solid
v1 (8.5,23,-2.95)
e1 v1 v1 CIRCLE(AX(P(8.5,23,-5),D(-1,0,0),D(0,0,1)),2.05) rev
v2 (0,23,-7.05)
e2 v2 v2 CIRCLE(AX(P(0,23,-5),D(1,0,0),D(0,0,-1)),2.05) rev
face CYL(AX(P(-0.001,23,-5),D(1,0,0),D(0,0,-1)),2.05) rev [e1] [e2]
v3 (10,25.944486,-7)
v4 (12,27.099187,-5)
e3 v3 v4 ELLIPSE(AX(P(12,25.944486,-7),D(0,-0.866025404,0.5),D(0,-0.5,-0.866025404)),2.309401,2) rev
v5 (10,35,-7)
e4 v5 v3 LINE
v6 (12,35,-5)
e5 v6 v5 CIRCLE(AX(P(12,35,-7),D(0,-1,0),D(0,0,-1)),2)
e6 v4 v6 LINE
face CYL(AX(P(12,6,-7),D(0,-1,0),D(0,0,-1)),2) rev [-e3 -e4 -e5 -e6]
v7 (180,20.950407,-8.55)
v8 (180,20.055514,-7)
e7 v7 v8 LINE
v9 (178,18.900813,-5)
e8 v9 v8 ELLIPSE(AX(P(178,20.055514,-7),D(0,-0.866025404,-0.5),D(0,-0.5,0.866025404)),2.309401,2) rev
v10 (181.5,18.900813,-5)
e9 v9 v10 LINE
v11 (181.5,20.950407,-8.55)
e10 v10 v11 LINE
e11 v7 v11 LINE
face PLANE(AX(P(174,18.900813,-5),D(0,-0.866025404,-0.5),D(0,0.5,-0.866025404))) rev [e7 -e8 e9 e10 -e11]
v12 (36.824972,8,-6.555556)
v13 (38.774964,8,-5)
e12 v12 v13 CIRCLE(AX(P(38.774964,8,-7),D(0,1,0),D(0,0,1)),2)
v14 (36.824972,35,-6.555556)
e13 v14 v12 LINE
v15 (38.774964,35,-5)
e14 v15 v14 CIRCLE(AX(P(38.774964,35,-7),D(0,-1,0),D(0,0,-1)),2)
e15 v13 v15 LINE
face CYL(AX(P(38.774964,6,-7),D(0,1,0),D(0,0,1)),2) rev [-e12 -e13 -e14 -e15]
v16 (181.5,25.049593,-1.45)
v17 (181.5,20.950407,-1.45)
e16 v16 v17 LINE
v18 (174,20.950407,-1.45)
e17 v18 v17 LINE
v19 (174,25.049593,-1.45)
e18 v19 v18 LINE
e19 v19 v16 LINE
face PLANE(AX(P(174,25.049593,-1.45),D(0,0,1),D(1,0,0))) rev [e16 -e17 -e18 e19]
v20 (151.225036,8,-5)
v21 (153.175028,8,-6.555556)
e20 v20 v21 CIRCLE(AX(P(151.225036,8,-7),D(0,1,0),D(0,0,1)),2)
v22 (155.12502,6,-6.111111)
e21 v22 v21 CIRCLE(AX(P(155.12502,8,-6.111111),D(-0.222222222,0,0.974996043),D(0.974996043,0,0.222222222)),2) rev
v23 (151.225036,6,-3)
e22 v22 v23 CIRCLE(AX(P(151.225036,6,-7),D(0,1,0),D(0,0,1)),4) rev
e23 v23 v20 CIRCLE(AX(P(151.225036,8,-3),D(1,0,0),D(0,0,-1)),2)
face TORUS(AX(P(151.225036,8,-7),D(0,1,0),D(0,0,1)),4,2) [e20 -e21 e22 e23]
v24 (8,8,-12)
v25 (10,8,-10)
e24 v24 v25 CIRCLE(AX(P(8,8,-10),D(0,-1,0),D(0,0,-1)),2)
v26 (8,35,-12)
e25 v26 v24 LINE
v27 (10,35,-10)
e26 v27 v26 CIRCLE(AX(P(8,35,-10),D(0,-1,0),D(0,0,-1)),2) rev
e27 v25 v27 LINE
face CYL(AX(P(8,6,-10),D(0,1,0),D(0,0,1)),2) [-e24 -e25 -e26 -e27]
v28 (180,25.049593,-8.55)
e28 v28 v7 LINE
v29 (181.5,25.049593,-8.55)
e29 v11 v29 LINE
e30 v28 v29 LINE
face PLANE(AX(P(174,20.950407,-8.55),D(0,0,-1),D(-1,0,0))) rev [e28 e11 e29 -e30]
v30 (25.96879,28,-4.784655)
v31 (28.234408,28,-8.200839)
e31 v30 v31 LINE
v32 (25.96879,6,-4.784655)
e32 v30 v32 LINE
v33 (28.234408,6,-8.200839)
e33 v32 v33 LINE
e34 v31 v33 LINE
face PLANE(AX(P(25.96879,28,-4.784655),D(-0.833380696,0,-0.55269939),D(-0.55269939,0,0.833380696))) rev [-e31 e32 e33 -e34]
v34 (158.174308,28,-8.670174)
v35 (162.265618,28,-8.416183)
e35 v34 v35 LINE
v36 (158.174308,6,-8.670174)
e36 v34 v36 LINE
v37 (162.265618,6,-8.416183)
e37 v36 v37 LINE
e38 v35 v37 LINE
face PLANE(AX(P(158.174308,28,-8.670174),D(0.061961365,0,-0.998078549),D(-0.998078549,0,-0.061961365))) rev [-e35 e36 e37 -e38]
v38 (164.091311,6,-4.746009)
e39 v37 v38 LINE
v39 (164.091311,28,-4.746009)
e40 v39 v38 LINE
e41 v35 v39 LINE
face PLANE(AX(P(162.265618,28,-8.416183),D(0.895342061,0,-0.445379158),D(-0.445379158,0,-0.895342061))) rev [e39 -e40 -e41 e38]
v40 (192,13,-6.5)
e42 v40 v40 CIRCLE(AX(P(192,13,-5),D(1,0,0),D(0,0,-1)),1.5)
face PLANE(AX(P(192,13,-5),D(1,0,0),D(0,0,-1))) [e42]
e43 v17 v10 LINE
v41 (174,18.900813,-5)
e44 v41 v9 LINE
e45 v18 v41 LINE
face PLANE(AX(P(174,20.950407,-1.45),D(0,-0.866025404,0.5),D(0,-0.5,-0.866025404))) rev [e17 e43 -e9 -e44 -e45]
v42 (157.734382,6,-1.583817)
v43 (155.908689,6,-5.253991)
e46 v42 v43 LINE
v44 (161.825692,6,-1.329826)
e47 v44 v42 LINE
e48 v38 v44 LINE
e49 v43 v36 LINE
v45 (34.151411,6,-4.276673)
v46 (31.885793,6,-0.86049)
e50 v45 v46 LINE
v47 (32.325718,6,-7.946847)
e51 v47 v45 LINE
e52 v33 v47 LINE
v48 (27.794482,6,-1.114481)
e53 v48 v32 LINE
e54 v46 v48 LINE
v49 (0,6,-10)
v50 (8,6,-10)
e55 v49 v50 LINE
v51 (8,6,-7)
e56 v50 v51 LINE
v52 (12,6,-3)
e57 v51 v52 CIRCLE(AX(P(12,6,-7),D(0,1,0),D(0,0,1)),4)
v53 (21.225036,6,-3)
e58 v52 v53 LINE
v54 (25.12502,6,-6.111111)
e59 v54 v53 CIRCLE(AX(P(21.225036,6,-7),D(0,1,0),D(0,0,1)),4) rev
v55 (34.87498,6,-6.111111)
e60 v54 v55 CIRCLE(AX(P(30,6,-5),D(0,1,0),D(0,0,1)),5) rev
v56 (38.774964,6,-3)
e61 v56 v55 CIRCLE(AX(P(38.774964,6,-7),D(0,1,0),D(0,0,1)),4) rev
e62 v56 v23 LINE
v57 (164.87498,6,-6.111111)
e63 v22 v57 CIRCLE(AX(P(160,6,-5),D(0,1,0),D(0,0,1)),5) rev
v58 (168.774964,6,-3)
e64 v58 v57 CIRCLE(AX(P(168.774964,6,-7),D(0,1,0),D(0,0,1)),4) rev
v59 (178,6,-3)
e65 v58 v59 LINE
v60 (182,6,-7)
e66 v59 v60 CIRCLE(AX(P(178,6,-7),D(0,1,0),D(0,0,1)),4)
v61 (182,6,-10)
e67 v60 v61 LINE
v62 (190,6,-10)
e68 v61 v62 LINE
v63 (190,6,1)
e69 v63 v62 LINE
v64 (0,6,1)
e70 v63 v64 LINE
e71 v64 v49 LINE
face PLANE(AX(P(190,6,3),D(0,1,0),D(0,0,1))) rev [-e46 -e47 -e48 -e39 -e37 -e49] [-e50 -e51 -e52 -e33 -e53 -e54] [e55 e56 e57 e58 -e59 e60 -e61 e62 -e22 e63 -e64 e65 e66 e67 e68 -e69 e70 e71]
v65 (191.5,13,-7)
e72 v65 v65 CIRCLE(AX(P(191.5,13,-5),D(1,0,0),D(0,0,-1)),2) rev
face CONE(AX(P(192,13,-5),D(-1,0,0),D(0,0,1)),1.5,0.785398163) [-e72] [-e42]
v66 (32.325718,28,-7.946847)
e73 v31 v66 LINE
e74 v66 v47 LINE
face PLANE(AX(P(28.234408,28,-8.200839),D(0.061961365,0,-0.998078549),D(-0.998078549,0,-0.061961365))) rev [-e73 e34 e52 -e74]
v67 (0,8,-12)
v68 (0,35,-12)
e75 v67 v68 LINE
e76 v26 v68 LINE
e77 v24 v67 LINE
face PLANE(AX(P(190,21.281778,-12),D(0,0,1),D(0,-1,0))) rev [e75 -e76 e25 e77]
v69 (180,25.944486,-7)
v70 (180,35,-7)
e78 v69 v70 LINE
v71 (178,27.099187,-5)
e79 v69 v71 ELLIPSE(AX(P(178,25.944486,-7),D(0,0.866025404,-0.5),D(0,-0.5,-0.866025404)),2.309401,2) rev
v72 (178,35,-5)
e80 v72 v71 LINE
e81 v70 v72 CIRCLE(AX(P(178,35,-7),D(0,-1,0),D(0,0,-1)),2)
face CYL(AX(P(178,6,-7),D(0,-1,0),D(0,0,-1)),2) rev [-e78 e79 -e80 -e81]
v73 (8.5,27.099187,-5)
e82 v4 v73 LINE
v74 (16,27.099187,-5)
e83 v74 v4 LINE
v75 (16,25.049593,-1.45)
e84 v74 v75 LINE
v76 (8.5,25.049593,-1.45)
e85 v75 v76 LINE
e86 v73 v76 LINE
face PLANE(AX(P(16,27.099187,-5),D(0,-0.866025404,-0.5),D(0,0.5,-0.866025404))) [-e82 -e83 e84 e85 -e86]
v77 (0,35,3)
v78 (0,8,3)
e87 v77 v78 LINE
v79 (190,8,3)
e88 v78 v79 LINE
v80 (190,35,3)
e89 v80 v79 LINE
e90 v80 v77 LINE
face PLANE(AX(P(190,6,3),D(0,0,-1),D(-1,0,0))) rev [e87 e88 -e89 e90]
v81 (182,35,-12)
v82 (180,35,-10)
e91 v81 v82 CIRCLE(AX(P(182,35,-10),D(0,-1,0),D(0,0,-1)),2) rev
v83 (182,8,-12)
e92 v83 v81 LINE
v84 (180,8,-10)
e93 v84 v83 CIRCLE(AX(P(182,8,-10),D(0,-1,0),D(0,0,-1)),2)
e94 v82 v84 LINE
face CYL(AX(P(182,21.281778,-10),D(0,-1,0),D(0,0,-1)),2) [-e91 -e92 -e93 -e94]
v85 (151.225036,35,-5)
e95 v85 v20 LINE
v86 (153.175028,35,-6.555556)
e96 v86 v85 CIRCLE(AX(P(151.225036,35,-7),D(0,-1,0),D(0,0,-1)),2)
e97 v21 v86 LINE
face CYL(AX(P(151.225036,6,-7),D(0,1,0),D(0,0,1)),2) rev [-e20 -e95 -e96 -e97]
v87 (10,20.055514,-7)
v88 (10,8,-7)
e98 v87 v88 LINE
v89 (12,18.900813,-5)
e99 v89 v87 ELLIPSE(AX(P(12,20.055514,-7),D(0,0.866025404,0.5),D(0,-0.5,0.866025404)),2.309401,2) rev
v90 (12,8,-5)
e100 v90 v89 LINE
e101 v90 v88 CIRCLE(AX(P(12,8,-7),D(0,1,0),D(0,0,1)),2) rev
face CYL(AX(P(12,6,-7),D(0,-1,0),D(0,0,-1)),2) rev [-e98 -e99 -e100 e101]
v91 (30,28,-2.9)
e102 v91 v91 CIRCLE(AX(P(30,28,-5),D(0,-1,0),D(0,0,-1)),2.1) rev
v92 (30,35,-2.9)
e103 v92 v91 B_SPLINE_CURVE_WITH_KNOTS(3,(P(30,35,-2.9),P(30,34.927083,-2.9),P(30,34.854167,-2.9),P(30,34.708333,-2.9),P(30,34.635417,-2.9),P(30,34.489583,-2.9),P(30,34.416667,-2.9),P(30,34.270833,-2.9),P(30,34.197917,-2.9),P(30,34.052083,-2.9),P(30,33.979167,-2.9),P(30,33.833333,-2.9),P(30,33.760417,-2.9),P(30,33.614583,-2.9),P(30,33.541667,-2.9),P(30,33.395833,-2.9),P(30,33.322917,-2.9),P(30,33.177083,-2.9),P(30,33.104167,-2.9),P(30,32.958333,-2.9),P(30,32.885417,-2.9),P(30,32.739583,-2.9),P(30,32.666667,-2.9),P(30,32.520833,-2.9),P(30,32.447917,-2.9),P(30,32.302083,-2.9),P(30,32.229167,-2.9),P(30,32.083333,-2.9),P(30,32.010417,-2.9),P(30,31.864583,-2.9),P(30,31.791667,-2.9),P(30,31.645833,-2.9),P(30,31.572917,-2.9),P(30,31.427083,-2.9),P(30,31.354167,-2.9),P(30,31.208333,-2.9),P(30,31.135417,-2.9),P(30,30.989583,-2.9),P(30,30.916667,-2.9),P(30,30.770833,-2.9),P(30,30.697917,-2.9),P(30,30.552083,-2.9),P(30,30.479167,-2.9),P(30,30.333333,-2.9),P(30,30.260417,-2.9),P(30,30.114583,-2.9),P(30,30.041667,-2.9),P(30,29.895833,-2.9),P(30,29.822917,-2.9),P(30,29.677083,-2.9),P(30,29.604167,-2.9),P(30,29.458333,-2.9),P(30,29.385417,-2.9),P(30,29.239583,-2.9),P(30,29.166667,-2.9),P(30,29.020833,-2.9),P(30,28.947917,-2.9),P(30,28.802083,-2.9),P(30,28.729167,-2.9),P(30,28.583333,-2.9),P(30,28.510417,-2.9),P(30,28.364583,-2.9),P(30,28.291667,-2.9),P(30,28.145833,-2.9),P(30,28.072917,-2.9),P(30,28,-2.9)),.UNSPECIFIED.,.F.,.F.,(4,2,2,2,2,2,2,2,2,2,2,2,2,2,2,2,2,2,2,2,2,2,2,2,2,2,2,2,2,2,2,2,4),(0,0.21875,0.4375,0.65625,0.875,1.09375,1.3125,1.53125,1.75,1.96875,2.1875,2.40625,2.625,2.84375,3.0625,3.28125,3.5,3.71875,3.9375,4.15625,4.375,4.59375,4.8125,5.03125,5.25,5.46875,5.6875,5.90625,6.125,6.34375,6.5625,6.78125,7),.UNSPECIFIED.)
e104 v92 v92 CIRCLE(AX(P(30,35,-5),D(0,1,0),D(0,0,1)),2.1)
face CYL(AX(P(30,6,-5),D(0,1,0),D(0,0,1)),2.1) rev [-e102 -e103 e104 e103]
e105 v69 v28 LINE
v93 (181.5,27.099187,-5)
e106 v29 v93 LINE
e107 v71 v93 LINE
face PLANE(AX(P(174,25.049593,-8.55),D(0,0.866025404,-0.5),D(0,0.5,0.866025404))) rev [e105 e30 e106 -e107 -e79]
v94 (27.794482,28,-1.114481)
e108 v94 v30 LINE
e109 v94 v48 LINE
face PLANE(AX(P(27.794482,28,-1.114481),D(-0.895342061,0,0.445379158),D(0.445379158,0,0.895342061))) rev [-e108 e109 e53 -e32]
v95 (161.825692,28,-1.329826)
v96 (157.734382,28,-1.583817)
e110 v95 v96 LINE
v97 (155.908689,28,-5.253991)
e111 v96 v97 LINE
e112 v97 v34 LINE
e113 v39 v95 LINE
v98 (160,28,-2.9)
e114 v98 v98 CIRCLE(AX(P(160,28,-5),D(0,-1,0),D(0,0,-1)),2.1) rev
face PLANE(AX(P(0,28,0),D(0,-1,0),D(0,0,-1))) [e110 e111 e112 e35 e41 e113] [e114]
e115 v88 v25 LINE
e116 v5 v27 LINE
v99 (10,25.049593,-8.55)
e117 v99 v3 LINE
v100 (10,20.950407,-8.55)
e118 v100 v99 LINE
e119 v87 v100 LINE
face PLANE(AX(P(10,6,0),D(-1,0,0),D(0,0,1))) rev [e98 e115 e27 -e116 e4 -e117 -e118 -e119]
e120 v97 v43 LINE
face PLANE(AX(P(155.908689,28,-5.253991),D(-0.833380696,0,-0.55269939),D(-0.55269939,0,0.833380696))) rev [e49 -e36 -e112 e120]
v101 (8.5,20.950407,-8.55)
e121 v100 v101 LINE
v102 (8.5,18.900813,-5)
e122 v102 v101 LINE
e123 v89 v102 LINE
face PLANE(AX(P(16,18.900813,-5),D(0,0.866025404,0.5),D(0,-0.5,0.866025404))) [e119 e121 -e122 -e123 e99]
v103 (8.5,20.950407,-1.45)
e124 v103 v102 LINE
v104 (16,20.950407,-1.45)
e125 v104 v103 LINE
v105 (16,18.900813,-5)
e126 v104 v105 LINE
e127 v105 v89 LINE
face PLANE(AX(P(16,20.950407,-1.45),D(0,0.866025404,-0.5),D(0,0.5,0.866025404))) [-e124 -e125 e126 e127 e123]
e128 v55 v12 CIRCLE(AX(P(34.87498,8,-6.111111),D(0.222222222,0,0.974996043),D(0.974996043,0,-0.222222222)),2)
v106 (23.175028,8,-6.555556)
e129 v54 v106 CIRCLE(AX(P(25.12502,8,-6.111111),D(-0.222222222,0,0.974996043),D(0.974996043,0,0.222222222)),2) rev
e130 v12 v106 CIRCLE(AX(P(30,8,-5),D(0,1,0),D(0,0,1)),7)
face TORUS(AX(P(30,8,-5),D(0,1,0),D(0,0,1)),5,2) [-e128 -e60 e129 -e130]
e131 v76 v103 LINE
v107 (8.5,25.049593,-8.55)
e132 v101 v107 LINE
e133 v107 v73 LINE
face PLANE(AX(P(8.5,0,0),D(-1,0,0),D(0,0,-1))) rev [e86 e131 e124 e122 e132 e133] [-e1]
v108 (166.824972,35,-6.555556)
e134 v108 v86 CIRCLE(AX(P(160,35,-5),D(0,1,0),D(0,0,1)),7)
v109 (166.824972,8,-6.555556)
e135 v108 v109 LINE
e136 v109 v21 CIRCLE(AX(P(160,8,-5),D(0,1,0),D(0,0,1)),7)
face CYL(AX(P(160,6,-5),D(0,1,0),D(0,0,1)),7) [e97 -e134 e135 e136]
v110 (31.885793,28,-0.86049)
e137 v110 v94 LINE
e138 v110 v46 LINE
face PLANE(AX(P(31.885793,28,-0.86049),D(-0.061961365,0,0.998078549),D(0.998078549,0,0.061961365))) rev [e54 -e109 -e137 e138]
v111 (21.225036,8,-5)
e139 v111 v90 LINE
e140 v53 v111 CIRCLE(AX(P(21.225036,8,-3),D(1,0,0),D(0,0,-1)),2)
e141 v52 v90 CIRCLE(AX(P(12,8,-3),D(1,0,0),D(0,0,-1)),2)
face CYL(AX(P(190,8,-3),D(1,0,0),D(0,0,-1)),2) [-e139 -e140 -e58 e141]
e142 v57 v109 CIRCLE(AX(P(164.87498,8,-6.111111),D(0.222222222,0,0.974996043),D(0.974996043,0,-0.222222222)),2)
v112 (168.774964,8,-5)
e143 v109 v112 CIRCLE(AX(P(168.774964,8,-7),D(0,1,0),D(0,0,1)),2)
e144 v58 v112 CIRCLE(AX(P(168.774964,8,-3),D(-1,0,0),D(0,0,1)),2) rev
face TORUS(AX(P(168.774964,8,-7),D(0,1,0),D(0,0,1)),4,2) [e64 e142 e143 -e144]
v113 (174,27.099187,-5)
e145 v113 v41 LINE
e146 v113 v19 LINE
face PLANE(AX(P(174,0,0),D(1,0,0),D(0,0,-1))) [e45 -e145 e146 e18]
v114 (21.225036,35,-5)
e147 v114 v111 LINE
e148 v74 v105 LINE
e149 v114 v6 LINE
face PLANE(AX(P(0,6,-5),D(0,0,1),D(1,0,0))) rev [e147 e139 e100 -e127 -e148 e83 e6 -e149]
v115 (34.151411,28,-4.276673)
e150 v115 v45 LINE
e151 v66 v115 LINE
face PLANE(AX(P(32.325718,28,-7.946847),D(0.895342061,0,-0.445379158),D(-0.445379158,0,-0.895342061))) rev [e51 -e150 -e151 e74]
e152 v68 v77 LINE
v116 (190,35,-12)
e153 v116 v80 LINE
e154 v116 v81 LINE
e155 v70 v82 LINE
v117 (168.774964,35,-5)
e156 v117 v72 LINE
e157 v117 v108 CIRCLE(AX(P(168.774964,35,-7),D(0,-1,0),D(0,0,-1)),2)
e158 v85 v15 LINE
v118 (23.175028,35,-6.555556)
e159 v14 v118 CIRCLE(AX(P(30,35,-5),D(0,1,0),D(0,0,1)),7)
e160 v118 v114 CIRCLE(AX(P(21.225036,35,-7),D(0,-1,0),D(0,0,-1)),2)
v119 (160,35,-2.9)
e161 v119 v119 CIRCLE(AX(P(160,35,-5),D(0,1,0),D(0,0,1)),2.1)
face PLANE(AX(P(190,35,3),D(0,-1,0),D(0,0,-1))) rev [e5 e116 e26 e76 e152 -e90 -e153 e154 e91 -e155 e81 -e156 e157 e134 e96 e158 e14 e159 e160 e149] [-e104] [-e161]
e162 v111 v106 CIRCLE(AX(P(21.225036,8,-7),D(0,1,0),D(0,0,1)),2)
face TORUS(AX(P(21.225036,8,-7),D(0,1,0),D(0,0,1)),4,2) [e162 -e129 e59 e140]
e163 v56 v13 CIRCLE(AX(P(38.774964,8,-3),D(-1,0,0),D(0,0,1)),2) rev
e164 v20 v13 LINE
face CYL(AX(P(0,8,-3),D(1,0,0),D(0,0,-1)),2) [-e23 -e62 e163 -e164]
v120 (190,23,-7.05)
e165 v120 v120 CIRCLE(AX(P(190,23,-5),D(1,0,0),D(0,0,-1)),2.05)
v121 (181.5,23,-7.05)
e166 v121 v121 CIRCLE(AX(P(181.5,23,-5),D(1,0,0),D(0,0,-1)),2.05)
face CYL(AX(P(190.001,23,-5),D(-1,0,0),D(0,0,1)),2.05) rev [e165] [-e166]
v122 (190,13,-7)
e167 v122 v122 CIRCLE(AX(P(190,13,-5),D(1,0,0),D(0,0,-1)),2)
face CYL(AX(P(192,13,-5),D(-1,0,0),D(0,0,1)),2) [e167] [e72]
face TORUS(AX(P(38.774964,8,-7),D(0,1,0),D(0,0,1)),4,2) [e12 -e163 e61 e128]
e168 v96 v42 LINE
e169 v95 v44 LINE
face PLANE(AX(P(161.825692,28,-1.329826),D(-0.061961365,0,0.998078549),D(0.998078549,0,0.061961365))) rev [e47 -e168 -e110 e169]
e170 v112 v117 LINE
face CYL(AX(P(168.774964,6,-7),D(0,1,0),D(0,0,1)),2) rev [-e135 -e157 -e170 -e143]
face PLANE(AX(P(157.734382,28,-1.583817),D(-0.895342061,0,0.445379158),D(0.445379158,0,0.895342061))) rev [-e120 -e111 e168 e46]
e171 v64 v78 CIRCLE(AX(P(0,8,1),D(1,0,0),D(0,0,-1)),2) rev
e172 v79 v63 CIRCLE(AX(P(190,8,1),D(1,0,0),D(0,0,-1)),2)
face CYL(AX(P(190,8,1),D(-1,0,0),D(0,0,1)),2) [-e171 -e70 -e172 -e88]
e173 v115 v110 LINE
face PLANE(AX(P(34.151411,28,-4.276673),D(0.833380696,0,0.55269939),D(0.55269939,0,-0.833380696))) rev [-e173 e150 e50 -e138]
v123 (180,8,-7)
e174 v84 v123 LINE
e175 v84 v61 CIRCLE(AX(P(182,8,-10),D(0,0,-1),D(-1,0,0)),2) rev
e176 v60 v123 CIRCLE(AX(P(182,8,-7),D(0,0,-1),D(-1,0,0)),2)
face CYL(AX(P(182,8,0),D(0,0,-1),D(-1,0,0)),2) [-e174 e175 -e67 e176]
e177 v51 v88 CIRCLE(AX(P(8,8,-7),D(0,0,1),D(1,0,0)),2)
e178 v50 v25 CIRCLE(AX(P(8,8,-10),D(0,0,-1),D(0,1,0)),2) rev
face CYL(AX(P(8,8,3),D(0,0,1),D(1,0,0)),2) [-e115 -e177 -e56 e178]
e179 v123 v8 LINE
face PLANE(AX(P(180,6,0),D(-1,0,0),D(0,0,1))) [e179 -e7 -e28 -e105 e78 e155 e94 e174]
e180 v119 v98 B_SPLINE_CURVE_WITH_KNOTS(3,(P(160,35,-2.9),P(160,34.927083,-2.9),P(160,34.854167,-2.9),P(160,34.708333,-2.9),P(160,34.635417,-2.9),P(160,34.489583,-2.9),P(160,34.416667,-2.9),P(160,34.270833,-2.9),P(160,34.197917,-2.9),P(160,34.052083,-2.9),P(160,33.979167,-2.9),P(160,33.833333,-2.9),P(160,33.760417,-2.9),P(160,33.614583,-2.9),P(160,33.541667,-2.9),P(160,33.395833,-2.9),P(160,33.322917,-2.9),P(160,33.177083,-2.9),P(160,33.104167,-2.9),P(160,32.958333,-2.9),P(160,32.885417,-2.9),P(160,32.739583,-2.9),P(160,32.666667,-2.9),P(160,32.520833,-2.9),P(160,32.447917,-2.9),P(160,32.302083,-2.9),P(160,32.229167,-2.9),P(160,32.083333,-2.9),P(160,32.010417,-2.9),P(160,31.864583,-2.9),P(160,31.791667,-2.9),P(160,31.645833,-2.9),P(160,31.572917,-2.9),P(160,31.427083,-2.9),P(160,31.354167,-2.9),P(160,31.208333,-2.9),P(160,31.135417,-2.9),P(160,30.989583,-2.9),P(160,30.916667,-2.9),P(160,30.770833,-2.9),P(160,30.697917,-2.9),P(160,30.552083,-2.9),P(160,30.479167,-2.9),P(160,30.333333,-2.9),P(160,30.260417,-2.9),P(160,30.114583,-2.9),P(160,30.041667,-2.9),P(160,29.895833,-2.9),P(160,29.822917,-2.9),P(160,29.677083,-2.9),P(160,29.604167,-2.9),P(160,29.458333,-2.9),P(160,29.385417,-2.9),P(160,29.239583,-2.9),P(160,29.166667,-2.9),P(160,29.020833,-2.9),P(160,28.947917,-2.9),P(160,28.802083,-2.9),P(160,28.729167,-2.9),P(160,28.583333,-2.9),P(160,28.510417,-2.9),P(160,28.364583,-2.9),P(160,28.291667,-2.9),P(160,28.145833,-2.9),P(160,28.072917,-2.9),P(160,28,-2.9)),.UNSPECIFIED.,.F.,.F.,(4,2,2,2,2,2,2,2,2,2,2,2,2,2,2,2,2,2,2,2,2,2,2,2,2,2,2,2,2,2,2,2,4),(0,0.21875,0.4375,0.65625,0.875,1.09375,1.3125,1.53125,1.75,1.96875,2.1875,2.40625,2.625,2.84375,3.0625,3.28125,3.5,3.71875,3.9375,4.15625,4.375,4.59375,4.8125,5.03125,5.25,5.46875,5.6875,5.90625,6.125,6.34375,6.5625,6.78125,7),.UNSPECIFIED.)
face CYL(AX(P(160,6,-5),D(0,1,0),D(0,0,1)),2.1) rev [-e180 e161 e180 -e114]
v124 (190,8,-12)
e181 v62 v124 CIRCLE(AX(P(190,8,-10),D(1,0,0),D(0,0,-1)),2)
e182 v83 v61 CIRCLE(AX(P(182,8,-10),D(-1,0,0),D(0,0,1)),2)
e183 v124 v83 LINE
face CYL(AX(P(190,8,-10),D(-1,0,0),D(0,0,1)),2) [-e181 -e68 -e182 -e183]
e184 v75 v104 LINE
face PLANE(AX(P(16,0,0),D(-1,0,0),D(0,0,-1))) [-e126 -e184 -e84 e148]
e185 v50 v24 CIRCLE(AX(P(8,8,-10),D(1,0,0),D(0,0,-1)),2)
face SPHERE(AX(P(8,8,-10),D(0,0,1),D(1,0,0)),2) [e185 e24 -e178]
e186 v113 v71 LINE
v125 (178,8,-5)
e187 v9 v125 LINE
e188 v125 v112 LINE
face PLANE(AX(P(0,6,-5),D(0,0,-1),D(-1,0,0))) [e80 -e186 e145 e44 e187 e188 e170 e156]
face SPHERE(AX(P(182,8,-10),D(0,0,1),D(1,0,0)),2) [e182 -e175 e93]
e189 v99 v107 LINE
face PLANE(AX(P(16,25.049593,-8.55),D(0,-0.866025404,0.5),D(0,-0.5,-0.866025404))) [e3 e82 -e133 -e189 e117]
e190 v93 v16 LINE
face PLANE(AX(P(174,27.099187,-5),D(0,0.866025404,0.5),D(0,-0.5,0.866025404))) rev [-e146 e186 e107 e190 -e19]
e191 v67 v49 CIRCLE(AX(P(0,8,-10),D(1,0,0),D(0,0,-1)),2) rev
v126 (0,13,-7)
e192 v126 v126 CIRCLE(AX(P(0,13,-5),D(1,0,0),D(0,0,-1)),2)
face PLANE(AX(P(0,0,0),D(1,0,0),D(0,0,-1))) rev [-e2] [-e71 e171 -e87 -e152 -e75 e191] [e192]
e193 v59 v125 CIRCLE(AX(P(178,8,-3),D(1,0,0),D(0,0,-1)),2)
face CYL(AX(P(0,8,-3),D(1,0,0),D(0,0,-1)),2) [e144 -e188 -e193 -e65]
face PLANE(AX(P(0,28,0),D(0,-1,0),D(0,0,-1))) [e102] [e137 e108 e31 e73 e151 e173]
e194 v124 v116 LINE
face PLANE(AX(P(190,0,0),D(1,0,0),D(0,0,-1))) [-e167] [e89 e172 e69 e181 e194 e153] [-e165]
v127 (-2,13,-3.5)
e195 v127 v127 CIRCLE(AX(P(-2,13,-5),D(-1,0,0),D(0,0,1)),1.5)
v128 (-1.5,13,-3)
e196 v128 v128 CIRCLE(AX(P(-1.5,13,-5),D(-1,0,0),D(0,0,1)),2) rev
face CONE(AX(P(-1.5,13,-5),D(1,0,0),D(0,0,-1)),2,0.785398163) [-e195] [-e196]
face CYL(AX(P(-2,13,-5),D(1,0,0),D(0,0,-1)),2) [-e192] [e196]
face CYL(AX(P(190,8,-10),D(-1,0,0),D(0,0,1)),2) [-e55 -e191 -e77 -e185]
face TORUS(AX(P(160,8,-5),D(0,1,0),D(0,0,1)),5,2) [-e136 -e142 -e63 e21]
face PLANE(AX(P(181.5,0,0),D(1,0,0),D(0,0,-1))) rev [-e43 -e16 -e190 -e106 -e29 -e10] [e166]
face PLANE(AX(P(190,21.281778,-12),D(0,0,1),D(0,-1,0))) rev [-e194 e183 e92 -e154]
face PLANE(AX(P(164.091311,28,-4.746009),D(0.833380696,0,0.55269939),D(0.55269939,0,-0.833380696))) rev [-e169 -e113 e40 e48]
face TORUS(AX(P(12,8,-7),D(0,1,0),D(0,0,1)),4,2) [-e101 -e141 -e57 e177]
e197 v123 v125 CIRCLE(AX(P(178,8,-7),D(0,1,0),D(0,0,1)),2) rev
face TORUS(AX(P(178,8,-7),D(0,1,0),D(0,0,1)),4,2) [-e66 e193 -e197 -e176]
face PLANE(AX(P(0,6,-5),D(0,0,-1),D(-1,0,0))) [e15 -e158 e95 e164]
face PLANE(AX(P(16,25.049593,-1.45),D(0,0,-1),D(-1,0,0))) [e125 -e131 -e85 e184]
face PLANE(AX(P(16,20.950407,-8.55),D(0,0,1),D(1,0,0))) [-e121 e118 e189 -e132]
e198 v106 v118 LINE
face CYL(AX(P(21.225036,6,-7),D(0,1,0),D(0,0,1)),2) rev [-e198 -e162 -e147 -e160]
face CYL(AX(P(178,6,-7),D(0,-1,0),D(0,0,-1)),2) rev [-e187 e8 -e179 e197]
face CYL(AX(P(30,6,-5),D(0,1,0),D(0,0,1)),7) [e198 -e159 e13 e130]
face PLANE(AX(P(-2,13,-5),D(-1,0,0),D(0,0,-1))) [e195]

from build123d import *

# Parameters (mm, degrees)
BOSS_EXTRUDE1_DEPTH      = 190
SKETCH2_R                = 2.1
CUT_EXTRUDE1_DEPTH       = 193.574660846
CUT_EXTRUDE3_START       = -29
CUT_EXTRUDE3_DEPTH       = 29
FILLET1_R                = 2
CUT_EXTRUDE4_DEPTH       = 22
CUT_EXTRUDE5_REACH       = 183.805
SKETCH5_R                = 2.05
CUT_EXTRUDE6_START       = -4
CUT_EXTRUDE6_DEPTH       = 7.5
SKETCH6_R                = 2
BOSS_EXTRUDE2_DEPTH      = 2
CHAMFER1_SIZE            = 0.5
CHAMFER1_OF_MIRROR1_SIZE = 0.5
FILLET2_R                = 2


# Read off the part's stored shape, not the designer's step: Cut-Extrude3
with BuildPart() as part:
    # Sketch1 → Boss-Extrude1 (new body)
    with BuildSketch(Plane(origin=(0, 0, 0), x_dir=(0, 0, -1), z_dir=(1, 0, 0))):
        Polygon((-3, 6), (-3, 35), (12, 35), (12, 21.281778339), (12, 18), (12, 6), align=None)
    extrude(amount=BOSS_EXTRUDE1_DEPTH)

    # Sketch2 → Cut-Extrude1 (cut, through all)
    with BuildSketch(Plane(origin=(0, 35, 0), x_dir=(1, 0, 0), z_dir=(0, 1, 0))):
        with Locations(Location((160, 5, 0), (0, 0, 270))):
            Circle(SKETCH2_R)
        with Locations(Location((30, 5, 0), (0, 0, 270))):
            Circle(SKETCH2_R)
    extrude(amount=-CUT_EXTRUDE1_DEPTH, mode=Mode.SUBTRACT)

    # Cut-Extrude3 outline → Cut-Extrude3 (cut)
    with BuildSketch(Plane(origin=(0, 35, 0), x_dir=(1, 0, 0), z_dir=(0, 1, 0)).offset(CUT_EXTRUDE3_START)):
        with BuildLine():
            ThreePointArc((23, 5), (25.050252532, 9.949747468), (30, 12))
            Line((30, 12), (10, 12))
            Line((10, 12), (10, 5))
            Line((10, 5), (23, 5))
        make_face()
        with BuildLine():
            Line((180, 12), (160, 12))
            ThreePointArc((160, 12), (164.949747468, 9.949747468), (167, 5))
            Line((167, 5), (180, 5))
            Line((180, 5), (180, 12))
        make_face()
        with BuildLine():
            Line((37, 5), (153, 5))
            ThreePointArc((153, 5), (155.050252532, 9.949747468), (160, 12))
            Line((160, 12), (30, 12))
            ThreePointArc((30, 12), (34.949747468, 9.949747468), (37, 5))
        make_face()
    extrude(amount=CUT_EXTRUDE3_DEPTH, mode=Mode.SUBTRACT)

    # Fillet1
    fillet1_edges = [part.edges().sort_by_distance(p)[0] for p in [
        (10, 20.5, -5),
        (180, 20.5, -5),
    ]]
    fillet(fillet1_edges, radius=FILLET1_R)

    # Sketch4 → Cut-Extrude4 (cut)
    with BuildSketch(Plane.XZ.offset(-6)):
        Polygon((34.151410886, -4.276672839), (31.885792779, -0.8604896), (27.794482256, -1.114480816), (25.968789841, -4.784655272), (28.234407948, -8.200838512), (32.325718471, -7.946847295), align=None)
        Polygon((164.091310523, -4.746008784), (161.825692416, -1.329825544), (157.734381893, -1.583816761), (155.908689477, -5.253991216), (158.174307584, -8.670174456), (162.265618107, -8.416183239), align=None)
    extrude(amount=-CUT_EXTRUDE4_DEPTH, mode=Mode.SUBTRACT)

    # Sketch5 → Cut-Extrude5 (cut, up to next)
    with BuildSketch(Plane(origin=(178, 0, 0), x_dir=(0, 0, -1), z_dir=(1, 0, 0)), mode=Mode.PRIVATE) as cut_extrude5_sk1:
        with Locations(Location((5, 23, 0), (0, 0, 270))):
            Circle(SKETCH5_R)
    cut_extrude5_tool1 = extrude(cut_extrude5_sk1.sketch, amount=CUT_EXTRUDE5_REACH, mode=Mode.PRIVATE) & part.part
    cut_extrude5 = cut_extrude5_tool1.solids().sort_by_distance((178, 23, -5))[0]
    add(cut_extrude5, mode=Mode.SUBTRACT)

    # Sketch5<3> → Cut-Extrude6 (cut)
    with BuildSketch(Plane(origin=(178, 0, 0), x_dir=(0, 0, -1), z_dir=(1, 0, 0)).offset(CUT_EXTRUDE6_START)):
        Polygon((5, 18.900813089), (8.55, 20.950406544), (8.55, 25.049593456), (5, 27.099186911), (1.45, 25.049593456), (1.45, 20.950406544), align=None)
    cut_extrude6 = extrude(amount=CUT_EXTRUDE6_DEPTH, mode=Mode.SUBTRACT)

    # Sketch6 → Boss-Extrude2 (add)
    with BuildSketch(Plane(origin=(190, 0, 0), x_dir=(0, 0, -1), z_dir=(1, 0, 0))):
        with Locations((5, 13)):
            Circle(SKETCH6_R)
    boss_extrude2 = extrude(amount=BOSS_EXTRUDE2_DEPTH)

    # Chamfer1
    chamfer1_edges = [part.edges().sort_by_distance(p)[0] for p in [
        (192, 13, -3),
    ]]
    chamfer(chamfer1_edges, length=CHAMFER1_SIZE)

    # Mirror1: Cut-Extrude5, Cut-Extrude6, Boss-Extrude2 across plane
    add(cut_extrude5.mirror(Plane(origin=(95, 0, 0), x_dir=(0, 0, 1), z_dir=(1, 0, 0))), mode=Mode.SUBTRACT)
    add(cut_extrude6.mirror(Plane(origin=(95, 0, 0), x_dir=(0, 0, 1), z_dir=(1, 0, 0))), mode=Mode.SUBTRACT)
    add(boss_extrude2.mirror(Plane(origin=(95, 0, 0), x_dir=(0, 0, 1), z_dir=(1, 0, 0))))

    # Chamfer1 of Mirror1
    chamfer1_of_mirror1_edges = [part.edges().sort_by_distance(p)[0] for p in [
        (-2, 13, -3),
    ]]
    chamfer(chamfer1_of_mirror1_edges, length=CHAMFER1_OF_MIRROR1_SIZE)

    # Fillet2
    fillet2_edges = [part.edges().sort_by_distance(p)[0] for p in [
        (185, 6, -12),
        (95, 6, 3),
        (153, 20.5, -5),
        (37, 20.5, -5),
        (164.949747468, 6, -9.949747468),
        (95, 6, -5),
        (34.949747468, 6, -9.949747468),
        (5, 6, -12),
        (23, 20.5, -5),
        (10, 6, -9.5),
        (10, 20.5, -12),
        (167, 20.5, -5),
        (180, 20.5, -12),
        (180, 6, -9.5),
        (17.5, 6, -5),
        (172.5, 6, -5),
        (10.585786438, 6, -5.585786438),
        (179.414213562, 6, -5.585786438),
    ]]
    fillet(fillet2_edges, radius=FILLET2_R)


solid = part.part
